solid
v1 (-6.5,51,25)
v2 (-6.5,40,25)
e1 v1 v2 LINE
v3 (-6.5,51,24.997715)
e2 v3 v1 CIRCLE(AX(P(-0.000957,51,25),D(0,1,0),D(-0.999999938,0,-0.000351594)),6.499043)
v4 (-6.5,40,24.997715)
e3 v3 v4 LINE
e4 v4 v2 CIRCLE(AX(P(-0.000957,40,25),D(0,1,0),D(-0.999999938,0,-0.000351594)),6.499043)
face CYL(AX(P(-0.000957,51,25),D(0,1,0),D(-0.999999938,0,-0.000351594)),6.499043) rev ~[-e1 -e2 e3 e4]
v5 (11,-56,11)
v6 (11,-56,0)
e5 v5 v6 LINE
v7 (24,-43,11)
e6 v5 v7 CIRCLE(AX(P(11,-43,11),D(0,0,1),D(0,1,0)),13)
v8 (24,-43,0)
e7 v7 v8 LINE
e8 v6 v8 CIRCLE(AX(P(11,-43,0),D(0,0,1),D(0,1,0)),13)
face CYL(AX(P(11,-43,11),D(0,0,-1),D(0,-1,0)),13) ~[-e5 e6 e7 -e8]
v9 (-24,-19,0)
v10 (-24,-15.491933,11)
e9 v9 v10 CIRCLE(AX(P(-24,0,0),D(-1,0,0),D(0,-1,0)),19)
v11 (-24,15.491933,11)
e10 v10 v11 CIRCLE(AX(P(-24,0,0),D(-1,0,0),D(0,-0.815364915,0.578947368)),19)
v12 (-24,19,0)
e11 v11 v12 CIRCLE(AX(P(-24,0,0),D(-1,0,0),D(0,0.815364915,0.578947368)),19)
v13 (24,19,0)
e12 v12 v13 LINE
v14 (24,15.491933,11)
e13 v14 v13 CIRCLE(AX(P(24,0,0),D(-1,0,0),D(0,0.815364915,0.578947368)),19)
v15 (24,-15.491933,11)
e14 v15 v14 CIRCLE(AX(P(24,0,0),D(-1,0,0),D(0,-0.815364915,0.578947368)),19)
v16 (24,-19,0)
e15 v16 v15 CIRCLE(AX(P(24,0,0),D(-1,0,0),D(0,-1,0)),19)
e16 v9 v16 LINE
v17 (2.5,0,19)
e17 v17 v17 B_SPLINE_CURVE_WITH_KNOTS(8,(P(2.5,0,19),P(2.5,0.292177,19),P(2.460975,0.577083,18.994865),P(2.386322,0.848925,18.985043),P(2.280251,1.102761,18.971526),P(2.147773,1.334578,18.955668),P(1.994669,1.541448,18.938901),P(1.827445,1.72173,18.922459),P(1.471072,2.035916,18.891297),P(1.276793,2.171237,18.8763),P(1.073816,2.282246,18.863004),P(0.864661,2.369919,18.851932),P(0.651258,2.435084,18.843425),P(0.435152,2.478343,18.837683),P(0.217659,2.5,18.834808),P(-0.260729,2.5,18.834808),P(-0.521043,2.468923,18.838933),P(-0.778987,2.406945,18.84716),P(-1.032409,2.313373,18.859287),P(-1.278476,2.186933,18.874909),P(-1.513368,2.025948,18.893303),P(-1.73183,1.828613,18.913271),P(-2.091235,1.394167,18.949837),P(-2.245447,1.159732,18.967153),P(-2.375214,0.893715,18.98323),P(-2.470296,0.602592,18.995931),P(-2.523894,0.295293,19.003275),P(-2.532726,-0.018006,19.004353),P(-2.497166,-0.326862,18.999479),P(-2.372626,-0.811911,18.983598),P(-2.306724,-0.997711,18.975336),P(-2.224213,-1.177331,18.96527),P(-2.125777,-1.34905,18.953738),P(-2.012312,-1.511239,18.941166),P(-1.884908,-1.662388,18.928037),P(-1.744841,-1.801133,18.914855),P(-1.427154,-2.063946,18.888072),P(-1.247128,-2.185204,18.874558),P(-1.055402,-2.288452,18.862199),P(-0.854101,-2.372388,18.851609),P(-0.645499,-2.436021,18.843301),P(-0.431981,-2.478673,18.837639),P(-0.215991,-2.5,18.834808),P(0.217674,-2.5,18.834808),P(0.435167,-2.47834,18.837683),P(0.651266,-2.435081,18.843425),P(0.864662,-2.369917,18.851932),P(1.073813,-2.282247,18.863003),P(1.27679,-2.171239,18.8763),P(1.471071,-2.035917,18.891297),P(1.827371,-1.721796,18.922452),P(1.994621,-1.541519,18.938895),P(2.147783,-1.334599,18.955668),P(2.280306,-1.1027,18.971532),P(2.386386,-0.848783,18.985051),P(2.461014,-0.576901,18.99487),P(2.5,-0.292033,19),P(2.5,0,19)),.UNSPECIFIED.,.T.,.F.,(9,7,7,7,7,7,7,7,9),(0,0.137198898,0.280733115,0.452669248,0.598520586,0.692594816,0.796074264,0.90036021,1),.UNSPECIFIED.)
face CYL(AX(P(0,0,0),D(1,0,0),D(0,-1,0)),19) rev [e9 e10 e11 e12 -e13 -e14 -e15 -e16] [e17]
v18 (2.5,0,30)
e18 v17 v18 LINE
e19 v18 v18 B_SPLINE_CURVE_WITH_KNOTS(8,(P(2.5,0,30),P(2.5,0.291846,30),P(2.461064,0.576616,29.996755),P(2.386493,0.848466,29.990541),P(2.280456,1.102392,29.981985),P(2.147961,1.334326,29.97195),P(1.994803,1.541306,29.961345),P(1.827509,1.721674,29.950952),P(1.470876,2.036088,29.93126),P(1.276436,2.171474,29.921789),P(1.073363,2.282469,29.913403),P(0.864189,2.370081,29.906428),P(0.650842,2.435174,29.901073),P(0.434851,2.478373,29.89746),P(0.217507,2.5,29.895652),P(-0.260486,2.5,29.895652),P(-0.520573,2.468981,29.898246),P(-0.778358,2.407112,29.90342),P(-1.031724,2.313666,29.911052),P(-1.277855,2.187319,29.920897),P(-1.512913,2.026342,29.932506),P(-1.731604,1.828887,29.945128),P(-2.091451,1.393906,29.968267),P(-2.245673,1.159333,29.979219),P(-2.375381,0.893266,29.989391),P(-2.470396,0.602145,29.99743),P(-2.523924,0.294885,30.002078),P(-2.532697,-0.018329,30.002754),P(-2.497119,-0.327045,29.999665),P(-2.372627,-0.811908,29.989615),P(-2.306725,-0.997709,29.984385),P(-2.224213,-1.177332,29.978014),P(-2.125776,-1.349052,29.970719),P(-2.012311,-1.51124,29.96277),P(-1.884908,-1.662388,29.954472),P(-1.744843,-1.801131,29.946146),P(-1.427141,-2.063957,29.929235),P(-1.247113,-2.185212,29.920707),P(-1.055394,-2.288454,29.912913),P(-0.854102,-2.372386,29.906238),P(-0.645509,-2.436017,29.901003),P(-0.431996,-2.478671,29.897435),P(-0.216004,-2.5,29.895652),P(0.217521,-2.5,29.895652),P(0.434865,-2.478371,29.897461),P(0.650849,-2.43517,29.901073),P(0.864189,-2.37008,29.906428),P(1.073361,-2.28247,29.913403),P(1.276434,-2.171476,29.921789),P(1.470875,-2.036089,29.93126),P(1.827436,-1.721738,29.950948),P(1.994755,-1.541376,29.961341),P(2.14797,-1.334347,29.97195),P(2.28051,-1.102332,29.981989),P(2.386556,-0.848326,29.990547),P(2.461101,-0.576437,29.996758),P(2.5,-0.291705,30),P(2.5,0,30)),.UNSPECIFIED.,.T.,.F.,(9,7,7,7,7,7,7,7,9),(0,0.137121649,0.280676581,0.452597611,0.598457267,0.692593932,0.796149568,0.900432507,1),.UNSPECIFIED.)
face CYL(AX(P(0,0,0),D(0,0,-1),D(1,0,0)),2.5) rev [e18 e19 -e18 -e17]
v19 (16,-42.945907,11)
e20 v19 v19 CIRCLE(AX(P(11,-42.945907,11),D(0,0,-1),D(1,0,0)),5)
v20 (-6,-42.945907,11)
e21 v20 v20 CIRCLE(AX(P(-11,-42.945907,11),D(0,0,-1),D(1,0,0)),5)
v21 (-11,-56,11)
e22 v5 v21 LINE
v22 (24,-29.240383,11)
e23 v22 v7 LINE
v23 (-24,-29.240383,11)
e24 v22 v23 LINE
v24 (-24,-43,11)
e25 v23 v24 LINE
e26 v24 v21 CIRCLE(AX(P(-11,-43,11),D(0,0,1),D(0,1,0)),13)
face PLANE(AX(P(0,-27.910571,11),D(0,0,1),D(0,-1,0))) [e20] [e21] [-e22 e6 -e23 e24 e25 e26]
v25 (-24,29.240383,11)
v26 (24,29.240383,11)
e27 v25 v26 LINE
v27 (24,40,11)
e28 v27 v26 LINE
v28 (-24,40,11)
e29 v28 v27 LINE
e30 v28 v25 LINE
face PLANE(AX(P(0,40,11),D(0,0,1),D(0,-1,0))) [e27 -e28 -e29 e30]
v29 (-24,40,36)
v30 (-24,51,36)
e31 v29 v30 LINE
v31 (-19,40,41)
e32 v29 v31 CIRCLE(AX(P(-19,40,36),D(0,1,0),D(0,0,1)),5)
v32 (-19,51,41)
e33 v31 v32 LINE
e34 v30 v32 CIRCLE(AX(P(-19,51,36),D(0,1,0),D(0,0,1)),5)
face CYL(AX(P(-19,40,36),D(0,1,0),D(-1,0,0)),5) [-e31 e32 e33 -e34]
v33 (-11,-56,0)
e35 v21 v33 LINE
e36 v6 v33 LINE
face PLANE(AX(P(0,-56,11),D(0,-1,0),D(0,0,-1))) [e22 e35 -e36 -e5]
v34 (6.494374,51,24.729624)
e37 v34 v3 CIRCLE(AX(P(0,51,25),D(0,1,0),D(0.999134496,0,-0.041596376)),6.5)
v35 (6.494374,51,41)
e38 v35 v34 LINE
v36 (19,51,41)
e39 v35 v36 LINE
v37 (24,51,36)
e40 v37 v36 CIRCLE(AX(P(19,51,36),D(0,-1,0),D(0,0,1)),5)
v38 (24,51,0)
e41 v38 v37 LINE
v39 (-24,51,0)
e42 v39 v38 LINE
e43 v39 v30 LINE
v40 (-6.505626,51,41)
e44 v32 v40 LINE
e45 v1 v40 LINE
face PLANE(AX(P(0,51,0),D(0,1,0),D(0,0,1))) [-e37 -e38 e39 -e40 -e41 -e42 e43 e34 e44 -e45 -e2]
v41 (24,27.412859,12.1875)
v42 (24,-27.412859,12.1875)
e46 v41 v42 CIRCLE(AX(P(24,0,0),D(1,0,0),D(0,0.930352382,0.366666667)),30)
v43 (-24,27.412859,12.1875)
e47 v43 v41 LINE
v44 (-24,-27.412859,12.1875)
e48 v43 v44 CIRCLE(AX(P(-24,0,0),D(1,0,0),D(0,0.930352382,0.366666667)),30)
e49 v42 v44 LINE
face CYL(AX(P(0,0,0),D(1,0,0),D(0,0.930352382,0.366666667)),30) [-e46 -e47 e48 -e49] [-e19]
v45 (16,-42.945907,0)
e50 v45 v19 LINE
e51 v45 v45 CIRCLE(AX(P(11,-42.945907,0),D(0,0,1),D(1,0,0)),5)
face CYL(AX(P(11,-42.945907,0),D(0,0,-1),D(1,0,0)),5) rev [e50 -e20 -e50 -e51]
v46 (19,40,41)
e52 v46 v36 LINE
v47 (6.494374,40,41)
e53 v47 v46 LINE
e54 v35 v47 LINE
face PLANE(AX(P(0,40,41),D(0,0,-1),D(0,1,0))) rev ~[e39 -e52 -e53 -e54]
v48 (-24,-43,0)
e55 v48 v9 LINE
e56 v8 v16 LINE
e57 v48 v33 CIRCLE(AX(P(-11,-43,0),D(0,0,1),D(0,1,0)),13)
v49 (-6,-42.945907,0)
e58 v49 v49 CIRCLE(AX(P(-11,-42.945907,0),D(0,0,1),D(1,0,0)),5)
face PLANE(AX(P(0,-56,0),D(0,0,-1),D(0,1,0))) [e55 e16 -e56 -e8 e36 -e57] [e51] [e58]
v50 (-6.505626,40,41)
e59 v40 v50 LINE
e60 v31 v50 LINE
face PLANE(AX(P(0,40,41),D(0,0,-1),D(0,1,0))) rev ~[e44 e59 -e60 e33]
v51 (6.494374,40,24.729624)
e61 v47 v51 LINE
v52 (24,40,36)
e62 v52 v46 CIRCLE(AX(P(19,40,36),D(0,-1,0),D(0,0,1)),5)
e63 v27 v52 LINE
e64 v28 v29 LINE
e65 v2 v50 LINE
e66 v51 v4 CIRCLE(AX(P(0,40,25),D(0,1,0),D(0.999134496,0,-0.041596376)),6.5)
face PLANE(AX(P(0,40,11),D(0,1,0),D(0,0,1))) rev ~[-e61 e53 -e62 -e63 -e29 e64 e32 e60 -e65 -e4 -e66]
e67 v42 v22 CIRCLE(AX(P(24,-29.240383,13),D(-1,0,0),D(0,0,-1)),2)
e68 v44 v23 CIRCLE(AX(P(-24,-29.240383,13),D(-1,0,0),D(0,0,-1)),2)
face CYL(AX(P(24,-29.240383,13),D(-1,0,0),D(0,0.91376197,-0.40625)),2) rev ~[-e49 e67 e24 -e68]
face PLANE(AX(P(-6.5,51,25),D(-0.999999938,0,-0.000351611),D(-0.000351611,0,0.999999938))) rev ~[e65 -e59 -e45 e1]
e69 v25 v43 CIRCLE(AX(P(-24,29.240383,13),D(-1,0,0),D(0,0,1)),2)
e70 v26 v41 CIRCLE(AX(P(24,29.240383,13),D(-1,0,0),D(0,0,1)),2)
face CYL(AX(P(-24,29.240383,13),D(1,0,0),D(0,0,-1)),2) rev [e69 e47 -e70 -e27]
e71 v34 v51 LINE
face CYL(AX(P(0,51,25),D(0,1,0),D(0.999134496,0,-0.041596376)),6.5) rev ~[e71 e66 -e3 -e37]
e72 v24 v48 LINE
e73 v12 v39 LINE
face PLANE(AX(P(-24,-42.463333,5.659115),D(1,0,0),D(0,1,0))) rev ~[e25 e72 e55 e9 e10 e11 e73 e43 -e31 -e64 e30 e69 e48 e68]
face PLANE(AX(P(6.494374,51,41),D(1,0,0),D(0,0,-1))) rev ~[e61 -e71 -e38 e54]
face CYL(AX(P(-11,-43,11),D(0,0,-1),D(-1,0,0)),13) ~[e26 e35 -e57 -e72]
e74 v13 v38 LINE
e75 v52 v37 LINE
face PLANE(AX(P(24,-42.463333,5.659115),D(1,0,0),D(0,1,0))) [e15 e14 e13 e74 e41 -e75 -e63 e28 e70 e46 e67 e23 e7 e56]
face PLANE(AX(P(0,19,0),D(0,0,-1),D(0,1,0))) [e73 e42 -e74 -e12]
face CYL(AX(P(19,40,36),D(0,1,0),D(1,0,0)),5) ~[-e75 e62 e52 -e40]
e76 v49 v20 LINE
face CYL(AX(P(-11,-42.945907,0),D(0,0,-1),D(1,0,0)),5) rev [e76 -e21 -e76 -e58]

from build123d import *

# Parameters (mm, degrees)
F0_W     = 11
F0_H     = 30
F1_DEPTH = 24
F3_DEPTH = 11
F4_R     = 5
F4_R_2   = 2.5
F5_DEPTH = 41.001
F6_R     = 13
F7_R     = 5
F8_R     = 2


# Not quite as in the source:
# - ends of sketch curves that miss each other by under 0.0002 mm in the source are joined


with BuildPart() as f1:
    # F0 (on Right) → F1 (new body, symmetric)
    with BuildSketch(Plane.YZ):
        with BuildLine():
            Line((-56, 0), (-30, 0))
            ThreePointArc((-30, 0), (-29.4730143031, 5.5983415304), (-27.9105714739, 11))
            Line((-27.9105714739, 11), (-56, 11))
            Line((-56, 11), (-56, 0))
        make_face()
        with BuildLine():
            Line((-30, 0), (-19, 0))
            ThreePointArc((-19, 0), (-18.1017503893, 5.7729223833), (-15.4919333848, 11))
            Line((-15.4919333848, 11), (-27.9105714739, 11))
            ThreePointArc((-27.9105714739, 11), (-29.4730143031, 5.5983415304), (-30, 0))
        make_face()
        with BuildLine():
            ThreePointArc((-15.4919333848, 11), (0, 19), (15.4919333848, 11))
            Line((15.4919333848, 11), (27.9105714739, 11))
            ThreePointArc((27.9105714739, 11), (0, 30), (-27.9105714739, 11))
            Line((-27.9105714739, 11), (-15.4919333848, 11))
        make_face()
        with BuildLine():
            ThreePointArc((15.4919333848, 11), (18.1017503893, 5.7729223833), (19, 0))
            Line((19, 0), (30, 0))
            ThreePointArc((30, 0), (29.4730143031, 5.5983415304), (27.9105714739, 11))
            Line((27.9105714739, 11), (15.4919333848, 11))
        make_face()
        with BuildLine():
            ThreePointArc((27.9105714739, 11), (29.4730143031, 5.5983415304), (30, 0))
            Line((30, 0), (51, 0))
            Line((51, 0), (51, 11))
            Line((51, 11), (40, 11))
            Line((40, 11), (27.9105714739, 11))
        make_face()
        with Locations((45.5, 26)):
            Rectangle(F0_W, F0_H)
    extrude(amount=F1_DEPTH, both=True)

    # F2 (on face) → F3 (cut, through all)
    with BuildSketch(Plane(origin=(0, 51, 0), x_dir=(-1, 0, 0), z_dir=(0, 1, 0))):
        with BuildLine():
            Line((-6.4943742253, 25.2703764435), (-6.4943742253, 24.7296235565))
            ThreePointArc((-6.4943742253, 24.7296235565), (0.1340750741, 18.501382926), (6.4999995983, 24.9977146924))
            ThreePointArc((6.4999995983, 24.9977146924), (6.4999998996, 24.9988573462), (6.5, 25))
            ThreePointArc((6.5, 25), (0.1352174827, 31.4985934041), (-6.4943742253, 25.2703764435))
        make_face()
        with BuildLine():
            Line((-6.4943742253, 41), (-6.4943742253, 25.2703764435))
            ThreePointArc((-6.4943742253, 25.2703764435), (0.1352174827, 31.4985934041), (6.5, 25))
            Line((6.5, 25), (6.5056257747, 41))
            Line((6.5056257747, 41), (-6.4943742253, 41))
        make_face()
    extrude(amount=-F3_DEPTH, mode=Mode.SUBTRACT)

    # F4 (on Top) → F5 (cut, through all)
    with BuildSketch(Plane.XY):
        with Locations((11, -42.9459065199)):
            Circle(F4_R)
        with Locations((-11, -42.9459065199)):
            Circle(F4_R)
        Circle(F4_R_2)
    extrude(amount=F5_DEPTH, mode=Mode.SUBTRACT)

    # F6
    f6_edges = [f1.edges().sort_by_distance(p)[0] for p in [
        (-24, -56, 5.5),
        (24, -56, 5.5),
    ]]
    fillet(f6_edges, radius=F6_R)

    # F7
    f7_edges = [f1.edges().sort_by_distance(p)[0] for p in [
        (-24, 45.5, 41),
        (24, 45.5, 41),
    ]]
    fillet(f7_edges, radius=F7_R)

    # F8
    f8_edges = [f1.edges().sort_by_distance(p)[0] for p in [
        (0, -27.910571, 11),
        (0, 27.910571, 11),
    ]]
    fillet(f8_edges, radius=F8_R)


solid = f1.part
